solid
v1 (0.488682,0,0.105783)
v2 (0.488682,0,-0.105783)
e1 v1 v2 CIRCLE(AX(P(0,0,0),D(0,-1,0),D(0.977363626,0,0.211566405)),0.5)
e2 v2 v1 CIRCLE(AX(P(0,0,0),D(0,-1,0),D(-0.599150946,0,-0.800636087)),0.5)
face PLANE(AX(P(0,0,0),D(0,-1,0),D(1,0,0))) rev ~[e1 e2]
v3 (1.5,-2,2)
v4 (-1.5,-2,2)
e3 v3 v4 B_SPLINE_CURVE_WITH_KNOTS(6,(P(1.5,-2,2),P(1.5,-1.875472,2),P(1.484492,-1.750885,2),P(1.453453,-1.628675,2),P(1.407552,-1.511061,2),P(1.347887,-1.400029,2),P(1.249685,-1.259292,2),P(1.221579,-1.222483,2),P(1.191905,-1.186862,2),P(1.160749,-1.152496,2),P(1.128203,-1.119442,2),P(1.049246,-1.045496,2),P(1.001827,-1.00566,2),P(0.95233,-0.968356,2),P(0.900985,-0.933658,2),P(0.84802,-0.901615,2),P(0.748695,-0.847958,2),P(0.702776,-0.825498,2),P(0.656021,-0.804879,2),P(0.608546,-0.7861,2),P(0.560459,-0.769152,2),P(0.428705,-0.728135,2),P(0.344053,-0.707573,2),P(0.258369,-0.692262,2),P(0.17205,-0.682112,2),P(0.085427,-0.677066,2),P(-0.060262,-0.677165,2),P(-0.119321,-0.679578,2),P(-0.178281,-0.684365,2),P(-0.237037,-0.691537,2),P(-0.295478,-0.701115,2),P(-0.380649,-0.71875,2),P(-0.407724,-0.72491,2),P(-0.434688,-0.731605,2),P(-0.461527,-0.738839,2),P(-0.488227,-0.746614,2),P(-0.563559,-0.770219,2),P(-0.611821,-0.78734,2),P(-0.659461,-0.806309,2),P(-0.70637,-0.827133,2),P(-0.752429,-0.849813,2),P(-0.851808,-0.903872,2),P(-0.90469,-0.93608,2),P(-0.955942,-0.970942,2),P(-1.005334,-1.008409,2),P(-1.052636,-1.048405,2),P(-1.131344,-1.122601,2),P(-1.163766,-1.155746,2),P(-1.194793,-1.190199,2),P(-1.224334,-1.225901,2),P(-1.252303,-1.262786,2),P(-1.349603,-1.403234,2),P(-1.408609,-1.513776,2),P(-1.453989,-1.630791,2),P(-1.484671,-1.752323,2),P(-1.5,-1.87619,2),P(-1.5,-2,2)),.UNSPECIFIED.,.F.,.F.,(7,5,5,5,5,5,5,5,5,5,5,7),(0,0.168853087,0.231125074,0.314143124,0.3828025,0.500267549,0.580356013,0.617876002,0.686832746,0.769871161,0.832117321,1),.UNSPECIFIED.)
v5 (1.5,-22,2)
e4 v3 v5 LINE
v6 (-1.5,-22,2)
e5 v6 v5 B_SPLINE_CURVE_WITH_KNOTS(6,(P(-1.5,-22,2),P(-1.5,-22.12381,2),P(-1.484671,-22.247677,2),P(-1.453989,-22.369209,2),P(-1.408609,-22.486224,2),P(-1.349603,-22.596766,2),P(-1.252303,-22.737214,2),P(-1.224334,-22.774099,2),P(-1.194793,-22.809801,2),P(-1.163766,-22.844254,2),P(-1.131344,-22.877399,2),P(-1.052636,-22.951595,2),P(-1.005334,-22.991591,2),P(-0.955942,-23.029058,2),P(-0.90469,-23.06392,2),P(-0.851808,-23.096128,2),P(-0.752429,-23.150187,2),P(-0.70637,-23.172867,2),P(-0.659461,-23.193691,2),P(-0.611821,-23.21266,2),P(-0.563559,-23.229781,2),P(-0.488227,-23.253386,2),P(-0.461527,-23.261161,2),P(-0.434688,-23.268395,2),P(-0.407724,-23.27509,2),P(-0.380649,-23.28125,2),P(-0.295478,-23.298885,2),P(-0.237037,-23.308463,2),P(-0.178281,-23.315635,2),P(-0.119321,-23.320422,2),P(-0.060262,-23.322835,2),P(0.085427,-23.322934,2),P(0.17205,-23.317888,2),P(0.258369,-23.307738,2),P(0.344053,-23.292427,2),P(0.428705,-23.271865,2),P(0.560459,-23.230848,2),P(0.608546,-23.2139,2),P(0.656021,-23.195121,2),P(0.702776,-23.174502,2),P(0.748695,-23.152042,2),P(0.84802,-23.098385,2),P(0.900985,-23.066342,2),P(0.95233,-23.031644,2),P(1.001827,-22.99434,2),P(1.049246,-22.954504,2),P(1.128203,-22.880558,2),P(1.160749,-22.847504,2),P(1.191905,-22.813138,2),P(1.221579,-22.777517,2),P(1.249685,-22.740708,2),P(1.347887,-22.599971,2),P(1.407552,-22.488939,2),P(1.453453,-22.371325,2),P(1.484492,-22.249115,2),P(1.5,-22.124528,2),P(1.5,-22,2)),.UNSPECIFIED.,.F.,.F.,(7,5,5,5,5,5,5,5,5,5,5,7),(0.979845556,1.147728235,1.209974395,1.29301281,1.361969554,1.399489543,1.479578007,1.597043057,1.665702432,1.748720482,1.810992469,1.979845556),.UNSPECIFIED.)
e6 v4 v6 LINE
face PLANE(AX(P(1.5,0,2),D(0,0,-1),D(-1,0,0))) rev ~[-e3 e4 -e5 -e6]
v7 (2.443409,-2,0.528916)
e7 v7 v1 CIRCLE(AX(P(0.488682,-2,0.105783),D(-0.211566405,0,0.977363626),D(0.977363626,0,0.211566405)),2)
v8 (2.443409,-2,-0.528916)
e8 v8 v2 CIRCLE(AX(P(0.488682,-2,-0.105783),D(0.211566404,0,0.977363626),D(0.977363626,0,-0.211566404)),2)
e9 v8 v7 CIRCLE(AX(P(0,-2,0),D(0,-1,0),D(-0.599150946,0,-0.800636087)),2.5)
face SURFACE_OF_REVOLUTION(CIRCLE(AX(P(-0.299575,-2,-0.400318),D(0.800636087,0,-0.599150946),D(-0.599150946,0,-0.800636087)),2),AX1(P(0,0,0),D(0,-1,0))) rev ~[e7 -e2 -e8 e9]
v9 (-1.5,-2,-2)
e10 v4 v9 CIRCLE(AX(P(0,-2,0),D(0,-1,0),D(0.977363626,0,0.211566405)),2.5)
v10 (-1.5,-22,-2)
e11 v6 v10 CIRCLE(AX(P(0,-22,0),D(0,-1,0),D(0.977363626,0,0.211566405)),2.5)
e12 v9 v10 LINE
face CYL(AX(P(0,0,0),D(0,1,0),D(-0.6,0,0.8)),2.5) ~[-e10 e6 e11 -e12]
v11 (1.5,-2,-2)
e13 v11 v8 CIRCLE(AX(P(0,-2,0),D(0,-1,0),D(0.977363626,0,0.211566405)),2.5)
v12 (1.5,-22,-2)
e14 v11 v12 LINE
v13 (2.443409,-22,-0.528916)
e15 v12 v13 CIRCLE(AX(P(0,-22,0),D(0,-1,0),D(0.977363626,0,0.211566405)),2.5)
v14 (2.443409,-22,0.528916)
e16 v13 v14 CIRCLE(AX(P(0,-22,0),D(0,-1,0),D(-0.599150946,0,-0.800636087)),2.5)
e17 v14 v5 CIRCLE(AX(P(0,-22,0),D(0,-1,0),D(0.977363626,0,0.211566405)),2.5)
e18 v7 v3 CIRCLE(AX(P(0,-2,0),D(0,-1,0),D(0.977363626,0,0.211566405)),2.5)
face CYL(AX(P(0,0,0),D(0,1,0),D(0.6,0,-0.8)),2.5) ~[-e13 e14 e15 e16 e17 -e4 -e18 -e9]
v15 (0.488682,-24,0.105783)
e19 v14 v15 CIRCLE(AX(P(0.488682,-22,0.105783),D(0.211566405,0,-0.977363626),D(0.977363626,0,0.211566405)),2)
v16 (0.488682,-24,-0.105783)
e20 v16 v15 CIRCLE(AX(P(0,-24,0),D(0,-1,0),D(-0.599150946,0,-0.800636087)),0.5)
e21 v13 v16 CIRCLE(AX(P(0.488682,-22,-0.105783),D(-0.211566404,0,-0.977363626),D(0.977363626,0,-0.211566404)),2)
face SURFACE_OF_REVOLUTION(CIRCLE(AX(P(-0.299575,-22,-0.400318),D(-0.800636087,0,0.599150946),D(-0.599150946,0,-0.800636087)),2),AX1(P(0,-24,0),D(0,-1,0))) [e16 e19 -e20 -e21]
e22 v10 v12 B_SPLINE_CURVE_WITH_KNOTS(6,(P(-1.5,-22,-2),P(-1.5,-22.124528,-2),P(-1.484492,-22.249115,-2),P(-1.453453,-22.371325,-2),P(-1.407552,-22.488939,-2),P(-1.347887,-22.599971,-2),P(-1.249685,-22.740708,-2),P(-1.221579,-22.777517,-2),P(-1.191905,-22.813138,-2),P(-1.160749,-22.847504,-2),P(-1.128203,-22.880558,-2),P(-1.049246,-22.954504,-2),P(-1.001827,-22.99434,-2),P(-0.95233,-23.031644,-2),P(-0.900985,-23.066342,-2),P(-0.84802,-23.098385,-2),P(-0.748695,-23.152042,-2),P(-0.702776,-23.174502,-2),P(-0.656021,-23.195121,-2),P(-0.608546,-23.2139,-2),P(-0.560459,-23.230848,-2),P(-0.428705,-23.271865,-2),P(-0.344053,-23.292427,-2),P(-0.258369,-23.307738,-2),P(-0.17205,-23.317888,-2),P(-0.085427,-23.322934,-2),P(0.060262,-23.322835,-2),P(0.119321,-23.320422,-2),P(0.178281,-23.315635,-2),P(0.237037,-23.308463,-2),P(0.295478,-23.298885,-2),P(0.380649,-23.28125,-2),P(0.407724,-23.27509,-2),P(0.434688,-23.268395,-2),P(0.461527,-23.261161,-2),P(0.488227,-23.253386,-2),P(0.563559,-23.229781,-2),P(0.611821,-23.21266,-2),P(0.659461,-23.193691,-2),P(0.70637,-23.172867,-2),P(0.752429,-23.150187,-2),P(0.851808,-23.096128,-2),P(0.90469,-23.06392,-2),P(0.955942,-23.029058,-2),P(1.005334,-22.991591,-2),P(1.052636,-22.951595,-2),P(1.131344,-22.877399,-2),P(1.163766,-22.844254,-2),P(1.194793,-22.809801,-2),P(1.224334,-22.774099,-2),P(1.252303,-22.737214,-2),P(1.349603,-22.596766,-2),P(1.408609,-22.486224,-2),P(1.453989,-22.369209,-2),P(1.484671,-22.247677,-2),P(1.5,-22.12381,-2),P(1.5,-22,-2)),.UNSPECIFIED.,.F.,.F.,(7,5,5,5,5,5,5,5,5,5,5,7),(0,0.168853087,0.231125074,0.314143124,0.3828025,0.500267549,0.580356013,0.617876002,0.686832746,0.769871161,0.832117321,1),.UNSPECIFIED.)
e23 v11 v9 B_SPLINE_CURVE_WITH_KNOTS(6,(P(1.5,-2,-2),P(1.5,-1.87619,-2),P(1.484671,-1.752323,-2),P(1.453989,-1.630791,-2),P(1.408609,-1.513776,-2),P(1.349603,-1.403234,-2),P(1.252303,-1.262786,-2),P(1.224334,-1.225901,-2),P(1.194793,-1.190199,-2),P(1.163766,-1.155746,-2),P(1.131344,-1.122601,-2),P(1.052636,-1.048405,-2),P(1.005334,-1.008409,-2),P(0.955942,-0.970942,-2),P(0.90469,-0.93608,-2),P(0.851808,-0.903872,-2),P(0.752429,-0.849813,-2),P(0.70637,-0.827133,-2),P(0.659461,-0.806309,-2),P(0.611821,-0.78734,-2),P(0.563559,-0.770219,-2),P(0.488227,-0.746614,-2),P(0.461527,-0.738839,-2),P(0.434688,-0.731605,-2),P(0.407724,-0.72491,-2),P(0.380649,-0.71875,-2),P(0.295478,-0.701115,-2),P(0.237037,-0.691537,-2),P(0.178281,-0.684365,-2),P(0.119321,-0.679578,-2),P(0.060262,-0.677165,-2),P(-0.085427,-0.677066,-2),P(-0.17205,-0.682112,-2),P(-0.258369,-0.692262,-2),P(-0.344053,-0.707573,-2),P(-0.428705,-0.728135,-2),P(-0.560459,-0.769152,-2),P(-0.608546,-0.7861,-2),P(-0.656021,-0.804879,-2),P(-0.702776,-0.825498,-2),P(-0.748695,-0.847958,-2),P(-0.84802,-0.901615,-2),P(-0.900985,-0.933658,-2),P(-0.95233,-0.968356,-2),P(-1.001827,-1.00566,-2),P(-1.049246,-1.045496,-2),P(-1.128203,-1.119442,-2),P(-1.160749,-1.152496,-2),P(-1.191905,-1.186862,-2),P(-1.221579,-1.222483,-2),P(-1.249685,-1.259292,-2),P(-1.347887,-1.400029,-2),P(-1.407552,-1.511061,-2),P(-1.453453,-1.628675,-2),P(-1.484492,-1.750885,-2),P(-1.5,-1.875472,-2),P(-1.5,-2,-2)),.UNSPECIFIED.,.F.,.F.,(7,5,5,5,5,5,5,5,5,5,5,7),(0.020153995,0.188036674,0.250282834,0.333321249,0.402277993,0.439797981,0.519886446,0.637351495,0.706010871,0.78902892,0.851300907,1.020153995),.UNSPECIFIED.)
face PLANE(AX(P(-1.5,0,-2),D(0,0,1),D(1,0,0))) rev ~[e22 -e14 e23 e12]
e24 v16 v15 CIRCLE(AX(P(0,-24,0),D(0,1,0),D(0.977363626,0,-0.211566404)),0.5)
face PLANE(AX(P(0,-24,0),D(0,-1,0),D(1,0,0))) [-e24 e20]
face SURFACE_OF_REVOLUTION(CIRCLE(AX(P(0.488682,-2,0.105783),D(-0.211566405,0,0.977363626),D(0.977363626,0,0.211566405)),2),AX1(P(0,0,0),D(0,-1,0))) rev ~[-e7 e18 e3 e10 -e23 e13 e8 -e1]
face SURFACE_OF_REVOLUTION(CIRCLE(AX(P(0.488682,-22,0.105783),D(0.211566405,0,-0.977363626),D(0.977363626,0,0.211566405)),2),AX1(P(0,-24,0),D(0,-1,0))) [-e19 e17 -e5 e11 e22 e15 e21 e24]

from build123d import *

# Parameters (mm, degrees)
F1_DEPTH    = 24
F2_T2_ANGLE = 335.5716732895
F2_T4_ANGLE = 335.5716732895
F2_T6_ANGLE = 253.6182255886
F2_T8_ANGLE = 253.6182255886


# Not quite as in the source:
# - a fillet or chamfer that OpenCascade refuses, or shapes differently, is made with other operations: its cross-section is extruded or revolved along the edge and cut away or added


with BuildPart() as f1:
    # F0 (on Front) → F1 (new body)
    with BuildSketch(Plane.XZ):
        with BuildLine():
            Line((1.5, 2), (-1.5, 2))
            ThreePointArc((-1.5, 2), (-2.5, 0), (-1.5, -2))
            Line((-1.5, -2), (1.5, -2))
            ThreePointArc((1.5, -2), (2.5, 0), (1.5, 2))
        make_face()
    extrude(amount=F1_DEPTH)

    # F2: fillet of radius 2 on 4 edges, made by hand

    # F2_s1 → F2_t2 (revolve, cut)
    with BuildSketch(Plane(origin=(0, 0, 0), x_dir=(0, 1, 0), z_dir=(0.2115664045, 0, -0.9773636255))):
        with BuildLine():
            ThreePointArc((-2, 2.5), (-0.5857864376, 1.9142135624), (0, 0.5))
            Line((0, 0.5), (0, 2.5))
            Line((0, 2.5), (-2, 2.5))
        make_face()
    revolve(axis=Axis((0, 0, 0), (0, -1, 0)), revolution_arc=F2_T2_ANGLE, mode=Mode.SUBTRACT)

    # F2_s3 → F2_t4 (revolve, cut)
    with BuildSketch(Plane(origin=(0, 0, 0), x_dir=(0, 1, 0), z_dir=(0.2115664045, 0, -0.9773636255))):
        with BuildLine():
            ThreePointArc((-22, 2.5), (-23.4142135624, 1.9142135624), (-24, 0.5))
            Line((-24, 0.5), (-24, 2.5))
            Line((-24, 2.5), (-22, 2.5))
        make_face()
    revolve(axis=Axis((0, -24, 0), (0, -1, 0)), revolution_arc=F2_T4_ANGLE, mode=Mode.SUBTRACT)

    # F2_s5 → F2_t6 (revolve, cut)
    with BuildSketch(Plane(origin=(0, 0, 0), x_dir=(0, 1, 0), z_dir=(-0.8006360872, 0, 0.5991509459))):
        with BuildLine():
            ThreePointArc((-2, 2.5), (-0.5857864376, 1.9142135624), (0, 0.5))
            Line((0, 0.5), (0, 2.5))
            Line((0, 2.5), (-2, 2.5))
        make_face()
    revolve(axis=Axis((0, 0, 0), (0, -1, 0)), revolution_arc=F2_T6_ANGLE, mode=Mode.SUBTRACT)

    # F2_s7 → F2_t8 (revolve, cut)
    with BuildSketch(Plane(origin=(0, 0, 0), x_dir=(0, 1, 0), z_dir=(-0.8006360872, 0, 0.5991509459))):
        with BuildLine():
            ThreePointArc((-22, 2.5), (-23.4142135624, 1.9142135624), (-24, 0.5))
            Line((-24, 0.5), (-24, 2.5))
            Line((-24, 2.5), (-22, 2.5))
        make_face()
    revolve(axis=Axis((0, -24, 0), (0, -1, 0)), revolution_arc=F2_T8_ANGLE, mode=Mode.SUBTRACT)


solid = f1.part
